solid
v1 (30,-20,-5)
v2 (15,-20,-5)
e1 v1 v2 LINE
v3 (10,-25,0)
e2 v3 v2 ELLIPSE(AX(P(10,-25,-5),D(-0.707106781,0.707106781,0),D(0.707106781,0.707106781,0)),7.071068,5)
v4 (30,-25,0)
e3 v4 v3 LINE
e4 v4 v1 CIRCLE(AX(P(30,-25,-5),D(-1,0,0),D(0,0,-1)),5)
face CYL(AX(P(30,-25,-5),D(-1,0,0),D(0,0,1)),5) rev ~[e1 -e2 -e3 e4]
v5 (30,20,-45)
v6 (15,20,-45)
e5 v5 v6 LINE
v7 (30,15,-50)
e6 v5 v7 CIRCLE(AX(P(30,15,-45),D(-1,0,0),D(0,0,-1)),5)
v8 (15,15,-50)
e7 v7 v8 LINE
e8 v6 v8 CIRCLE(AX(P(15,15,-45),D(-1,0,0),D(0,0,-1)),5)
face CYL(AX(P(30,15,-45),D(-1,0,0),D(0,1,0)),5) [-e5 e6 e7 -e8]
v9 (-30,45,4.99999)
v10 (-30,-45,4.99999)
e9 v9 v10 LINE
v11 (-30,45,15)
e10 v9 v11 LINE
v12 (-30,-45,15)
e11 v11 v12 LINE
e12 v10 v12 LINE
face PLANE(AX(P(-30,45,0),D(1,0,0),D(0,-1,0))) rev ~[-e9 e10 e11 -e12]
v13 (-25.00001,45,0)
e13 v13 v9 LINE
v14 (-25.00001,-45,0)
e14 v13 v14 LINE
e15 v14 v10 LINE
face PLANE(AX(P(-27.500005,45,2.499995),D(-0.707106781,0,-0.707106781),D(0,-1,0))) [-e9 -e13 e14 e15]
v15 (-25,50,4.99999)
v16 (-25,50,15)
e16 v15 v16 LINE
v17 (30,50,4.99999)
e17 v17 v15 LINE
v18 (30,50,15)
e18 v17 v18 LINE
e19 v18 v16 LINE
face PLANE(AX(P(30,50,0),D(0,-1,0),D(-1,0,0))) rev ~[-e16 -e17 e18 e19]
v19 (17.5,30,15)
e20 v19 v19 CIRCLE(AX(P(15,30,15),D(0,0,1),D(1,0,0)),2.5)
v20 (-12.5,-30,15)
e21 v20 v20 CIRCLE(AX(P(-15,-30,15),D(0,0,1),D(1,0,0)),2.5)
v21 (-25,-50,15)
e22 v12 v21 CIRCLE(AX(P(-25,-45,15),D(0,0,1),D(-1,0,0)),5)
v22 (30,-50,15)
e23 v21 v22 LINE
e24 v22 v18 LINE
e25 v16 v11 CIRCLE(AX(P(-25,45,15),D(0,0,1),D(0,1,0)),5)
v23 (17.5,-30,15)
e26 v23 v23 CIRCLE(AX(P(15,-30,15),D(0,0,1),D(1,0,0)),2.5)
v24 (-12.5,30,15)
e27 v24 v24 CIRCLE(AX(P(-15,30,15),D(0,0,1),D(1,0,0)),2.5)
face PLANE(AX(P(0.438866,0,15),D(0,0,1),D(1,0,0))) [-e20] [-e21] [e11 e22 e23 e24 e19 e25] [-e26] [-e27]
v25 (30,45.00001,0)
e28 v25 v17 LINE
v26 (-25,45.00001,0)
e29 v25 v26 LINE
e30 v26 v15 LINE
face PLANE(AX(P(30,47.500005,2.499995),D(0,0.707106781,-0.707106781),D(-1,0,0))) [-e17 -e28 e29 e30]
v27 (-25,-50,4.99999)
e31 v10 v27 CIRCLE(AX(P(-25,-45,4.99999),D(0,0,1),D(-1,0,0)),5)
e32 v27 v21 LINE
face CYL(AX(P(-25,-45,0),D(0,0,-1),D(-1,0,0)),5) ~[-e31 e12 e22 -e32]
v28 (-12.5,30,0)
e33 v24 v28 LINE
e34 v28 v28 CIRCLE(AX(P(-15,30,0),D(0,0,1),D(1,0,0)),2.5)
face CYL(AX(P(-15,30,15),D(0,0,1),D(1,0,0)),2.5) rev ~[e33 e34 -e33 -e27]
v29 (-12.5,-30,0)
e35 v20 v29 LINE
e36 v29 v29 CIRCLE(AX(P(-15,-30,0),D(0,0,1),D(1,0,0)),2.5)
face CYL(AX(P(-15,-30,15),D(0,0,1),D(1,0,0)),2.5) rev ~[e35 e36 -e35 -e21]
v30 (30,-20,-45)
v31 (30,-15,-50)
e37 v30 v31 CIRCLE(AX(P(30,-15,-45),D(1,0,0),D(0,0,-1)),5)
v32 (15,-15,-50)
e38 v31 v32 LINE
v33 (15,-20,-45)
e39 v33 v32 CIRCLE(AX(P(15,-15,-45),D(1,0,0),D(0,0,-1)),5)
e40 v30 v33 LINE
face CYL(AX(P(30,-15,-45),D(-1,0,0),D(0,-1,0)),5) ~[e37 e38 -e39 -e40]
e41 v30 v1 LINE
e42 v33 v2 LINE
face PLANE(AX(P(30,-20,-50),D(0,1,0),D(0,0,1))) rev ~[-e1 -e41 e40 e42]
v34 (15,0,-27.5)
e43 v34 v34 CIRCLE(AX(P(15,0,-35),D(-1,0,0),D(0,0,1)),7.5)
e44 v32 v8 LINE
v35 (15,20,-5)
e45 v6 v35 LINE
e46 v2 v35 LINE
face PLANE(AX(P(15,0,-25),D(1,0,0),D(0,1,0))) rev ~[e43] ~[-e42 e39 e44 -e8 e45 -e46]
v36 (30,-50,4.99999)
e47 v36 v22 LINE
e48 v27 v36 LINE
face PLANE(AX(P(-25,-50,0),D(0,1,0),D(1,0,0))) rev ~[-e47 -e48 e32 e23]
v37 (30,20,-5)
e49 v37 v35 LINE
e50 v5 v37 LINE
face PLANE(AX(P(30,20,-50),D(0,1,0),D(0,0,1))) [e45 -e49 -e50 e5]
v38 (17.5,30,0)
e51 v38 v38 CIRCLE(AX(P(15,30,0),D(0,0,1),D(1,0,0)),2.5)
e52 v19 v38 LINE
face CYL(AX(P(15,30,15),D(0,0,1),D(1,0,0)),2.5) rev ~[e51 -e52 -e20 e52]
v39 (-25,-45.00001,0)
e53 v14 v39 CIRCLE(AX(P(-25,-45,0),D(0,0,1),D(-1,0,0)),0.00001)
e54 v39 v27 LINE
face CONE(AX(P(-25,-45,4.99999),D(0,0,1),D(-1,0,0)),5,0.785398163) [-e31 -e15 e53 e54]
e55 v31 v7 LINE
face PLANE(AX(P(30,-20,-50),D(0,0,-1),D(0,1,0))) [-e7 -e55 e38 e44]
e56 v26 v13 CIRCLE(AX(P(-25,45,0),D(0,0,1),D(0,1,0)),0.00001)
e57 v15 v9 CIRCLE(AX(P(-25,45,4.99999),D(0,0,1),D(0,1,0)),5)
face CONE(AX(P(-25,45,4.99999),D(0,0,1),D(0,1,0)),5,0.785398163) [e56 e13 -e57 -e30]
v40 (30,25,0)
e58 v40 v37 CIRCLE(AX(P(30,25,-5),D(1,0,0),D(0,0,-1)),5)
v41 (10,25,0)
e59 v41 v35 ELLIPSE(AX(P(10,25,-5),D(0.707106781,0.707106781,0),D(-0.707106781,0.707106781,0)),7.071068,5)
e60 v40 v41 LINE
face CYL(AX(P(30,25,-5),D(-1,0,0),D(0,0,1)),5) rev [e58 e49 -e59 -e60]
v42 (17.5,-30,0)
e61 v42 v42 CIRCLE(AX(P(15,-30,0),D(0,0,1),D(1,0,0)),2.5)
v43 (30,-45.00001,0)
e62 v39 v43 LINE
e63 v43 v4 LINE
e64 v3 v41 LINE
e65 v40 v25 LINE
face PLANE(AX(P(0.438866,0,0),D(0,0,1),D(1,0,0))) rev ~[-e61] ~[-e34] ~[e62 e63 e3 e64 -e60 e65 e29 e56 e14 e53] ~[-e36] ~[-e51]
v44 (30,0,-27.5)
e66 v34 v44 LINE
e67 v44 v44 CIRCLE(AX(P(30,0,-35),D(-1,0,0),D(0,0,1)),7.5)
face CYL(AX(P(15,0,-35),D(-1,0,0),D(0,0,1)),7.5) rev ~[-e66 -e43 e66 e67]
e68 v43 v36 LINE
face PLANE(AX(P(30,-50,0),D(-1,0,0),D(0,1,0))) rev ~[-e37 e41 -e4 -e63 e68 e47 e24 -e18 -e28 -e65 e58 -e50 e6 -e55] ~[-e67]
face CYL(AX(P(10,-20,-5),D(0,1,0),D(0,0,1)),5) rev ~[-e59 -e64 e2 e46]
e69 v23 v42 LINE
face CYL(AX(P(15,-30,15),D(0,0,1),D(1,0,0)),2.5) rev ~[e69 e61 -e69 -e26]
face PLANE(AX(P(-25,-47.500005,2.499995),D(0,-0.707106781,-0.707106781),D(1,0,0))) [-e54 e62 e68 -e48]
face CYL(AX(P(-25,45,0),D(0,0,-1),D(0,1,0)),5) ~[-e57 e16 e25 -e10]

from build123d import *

# Parameters (mm, degrees)
F1_DEPTH  = 15
F2_W      = 40
F2_H      = 50
F3_DEPTH  = 15
F5_R      = 5
F6_SIZE   = 4.99999
F8_DEPTH  = 25
F9_R      = 2.5
F10_DEPTH = 25


# Not quite as in the source:
# - a fillet or chamfer is up to 0.001 mm smaller than in the source, because OpenCascade refuses the exact size


with BuildPart() as f1:
    # F0 (on Top) → F1 (new body)
    with BuildSketch(Plane.XY):
        with BuildLine():
            Line((30, 50), (-25, 50))
            ThreePointArc((-25, 50), (-28.5355339059, 48.5355339059), (-30, 45))
            Line((-30, 45), (-30, -45))
            ThreePointArc((-30, -45), (-28.5355339059, -48.5355339059), (-25, -50))
            Line((-25, -50), (30, -50))
            Line((30, -50), (30, 50))
        make_face()
    extrude(amount=F1_DEPTH)


with BuildPart() as f3:
    # F2 (on face) → F3 (new body)
    with BuildSketch(Plane.YZ.offset(30)):
        with Locations((0, -25)):
            Rectangle(F2_W, F2_H)
    extrude(amount=-F3_DEPTH)

    # F4: union F1
    add(f1.part)

    # F5
    f5_edges = [f3.edges().sort_by_distance(p)[0] for p in [
        (15, 0, 0),
        (22.5, 20, -50),
        (22.5, -20, -50),
        (22.5, 20, 0),
        (22.5, -20, 0),
    ]]
    fillet(f5_edges, radius=F5_R)

    # F6 (size 5 in the source; OpenCascade refuses exactly that, so slightly less here)
    f6_edges = [f3.edges().sort_by_distance(p)[0] for p in [
        (-30, 0, 0),
        (2.5, 50, 0),
        (2.5, -50, 0),
    ]]
    chamfer(f6_edges, length=F6_SIZE)

    # F7 (on face) → F8 (cut)
    with BuildSketch(Plane(origin=(15, 0, 0), x_dir=(0, -1, 0), z_dir=(-1, 0, 0))):
        with BuildLine():
            Line((0, -27.5), (0, -42.5))
            ThreePointArc((0, -42.5), (5.3033008589, -40.3033008589), (7.5, -35))
            ThreePointArc((7.5, -35), (5.3033008589, -29.6966991411), (0, -27.5))
        make_face()
        with BuildLine():
            ThreePointArc((0, -27.5), (-7.5, -35), (0, -42.5))
            Line((0, -42.5), (0, -27.5))
        make_face()
    extrude(amount=-F8_DEPTH, mode=Mode.SUBTRACT)

    # F9 (on face) → F10 (cut)
    with BuildSketch(Plane.XY.offset(15)):
        with Locations((-15, -30)):
            Circle(F9_R)
        with Locations((-15, 30)):
            Circle(F9_R)
        with Locations((15, -30)):
            Circle(F9_R)
        with Locations((15, 30)):
            Circle(F9_R)
    extrude(amount=-F10_DEPTH, mode=Mode.SUBTRACT)


solid = f3.part
